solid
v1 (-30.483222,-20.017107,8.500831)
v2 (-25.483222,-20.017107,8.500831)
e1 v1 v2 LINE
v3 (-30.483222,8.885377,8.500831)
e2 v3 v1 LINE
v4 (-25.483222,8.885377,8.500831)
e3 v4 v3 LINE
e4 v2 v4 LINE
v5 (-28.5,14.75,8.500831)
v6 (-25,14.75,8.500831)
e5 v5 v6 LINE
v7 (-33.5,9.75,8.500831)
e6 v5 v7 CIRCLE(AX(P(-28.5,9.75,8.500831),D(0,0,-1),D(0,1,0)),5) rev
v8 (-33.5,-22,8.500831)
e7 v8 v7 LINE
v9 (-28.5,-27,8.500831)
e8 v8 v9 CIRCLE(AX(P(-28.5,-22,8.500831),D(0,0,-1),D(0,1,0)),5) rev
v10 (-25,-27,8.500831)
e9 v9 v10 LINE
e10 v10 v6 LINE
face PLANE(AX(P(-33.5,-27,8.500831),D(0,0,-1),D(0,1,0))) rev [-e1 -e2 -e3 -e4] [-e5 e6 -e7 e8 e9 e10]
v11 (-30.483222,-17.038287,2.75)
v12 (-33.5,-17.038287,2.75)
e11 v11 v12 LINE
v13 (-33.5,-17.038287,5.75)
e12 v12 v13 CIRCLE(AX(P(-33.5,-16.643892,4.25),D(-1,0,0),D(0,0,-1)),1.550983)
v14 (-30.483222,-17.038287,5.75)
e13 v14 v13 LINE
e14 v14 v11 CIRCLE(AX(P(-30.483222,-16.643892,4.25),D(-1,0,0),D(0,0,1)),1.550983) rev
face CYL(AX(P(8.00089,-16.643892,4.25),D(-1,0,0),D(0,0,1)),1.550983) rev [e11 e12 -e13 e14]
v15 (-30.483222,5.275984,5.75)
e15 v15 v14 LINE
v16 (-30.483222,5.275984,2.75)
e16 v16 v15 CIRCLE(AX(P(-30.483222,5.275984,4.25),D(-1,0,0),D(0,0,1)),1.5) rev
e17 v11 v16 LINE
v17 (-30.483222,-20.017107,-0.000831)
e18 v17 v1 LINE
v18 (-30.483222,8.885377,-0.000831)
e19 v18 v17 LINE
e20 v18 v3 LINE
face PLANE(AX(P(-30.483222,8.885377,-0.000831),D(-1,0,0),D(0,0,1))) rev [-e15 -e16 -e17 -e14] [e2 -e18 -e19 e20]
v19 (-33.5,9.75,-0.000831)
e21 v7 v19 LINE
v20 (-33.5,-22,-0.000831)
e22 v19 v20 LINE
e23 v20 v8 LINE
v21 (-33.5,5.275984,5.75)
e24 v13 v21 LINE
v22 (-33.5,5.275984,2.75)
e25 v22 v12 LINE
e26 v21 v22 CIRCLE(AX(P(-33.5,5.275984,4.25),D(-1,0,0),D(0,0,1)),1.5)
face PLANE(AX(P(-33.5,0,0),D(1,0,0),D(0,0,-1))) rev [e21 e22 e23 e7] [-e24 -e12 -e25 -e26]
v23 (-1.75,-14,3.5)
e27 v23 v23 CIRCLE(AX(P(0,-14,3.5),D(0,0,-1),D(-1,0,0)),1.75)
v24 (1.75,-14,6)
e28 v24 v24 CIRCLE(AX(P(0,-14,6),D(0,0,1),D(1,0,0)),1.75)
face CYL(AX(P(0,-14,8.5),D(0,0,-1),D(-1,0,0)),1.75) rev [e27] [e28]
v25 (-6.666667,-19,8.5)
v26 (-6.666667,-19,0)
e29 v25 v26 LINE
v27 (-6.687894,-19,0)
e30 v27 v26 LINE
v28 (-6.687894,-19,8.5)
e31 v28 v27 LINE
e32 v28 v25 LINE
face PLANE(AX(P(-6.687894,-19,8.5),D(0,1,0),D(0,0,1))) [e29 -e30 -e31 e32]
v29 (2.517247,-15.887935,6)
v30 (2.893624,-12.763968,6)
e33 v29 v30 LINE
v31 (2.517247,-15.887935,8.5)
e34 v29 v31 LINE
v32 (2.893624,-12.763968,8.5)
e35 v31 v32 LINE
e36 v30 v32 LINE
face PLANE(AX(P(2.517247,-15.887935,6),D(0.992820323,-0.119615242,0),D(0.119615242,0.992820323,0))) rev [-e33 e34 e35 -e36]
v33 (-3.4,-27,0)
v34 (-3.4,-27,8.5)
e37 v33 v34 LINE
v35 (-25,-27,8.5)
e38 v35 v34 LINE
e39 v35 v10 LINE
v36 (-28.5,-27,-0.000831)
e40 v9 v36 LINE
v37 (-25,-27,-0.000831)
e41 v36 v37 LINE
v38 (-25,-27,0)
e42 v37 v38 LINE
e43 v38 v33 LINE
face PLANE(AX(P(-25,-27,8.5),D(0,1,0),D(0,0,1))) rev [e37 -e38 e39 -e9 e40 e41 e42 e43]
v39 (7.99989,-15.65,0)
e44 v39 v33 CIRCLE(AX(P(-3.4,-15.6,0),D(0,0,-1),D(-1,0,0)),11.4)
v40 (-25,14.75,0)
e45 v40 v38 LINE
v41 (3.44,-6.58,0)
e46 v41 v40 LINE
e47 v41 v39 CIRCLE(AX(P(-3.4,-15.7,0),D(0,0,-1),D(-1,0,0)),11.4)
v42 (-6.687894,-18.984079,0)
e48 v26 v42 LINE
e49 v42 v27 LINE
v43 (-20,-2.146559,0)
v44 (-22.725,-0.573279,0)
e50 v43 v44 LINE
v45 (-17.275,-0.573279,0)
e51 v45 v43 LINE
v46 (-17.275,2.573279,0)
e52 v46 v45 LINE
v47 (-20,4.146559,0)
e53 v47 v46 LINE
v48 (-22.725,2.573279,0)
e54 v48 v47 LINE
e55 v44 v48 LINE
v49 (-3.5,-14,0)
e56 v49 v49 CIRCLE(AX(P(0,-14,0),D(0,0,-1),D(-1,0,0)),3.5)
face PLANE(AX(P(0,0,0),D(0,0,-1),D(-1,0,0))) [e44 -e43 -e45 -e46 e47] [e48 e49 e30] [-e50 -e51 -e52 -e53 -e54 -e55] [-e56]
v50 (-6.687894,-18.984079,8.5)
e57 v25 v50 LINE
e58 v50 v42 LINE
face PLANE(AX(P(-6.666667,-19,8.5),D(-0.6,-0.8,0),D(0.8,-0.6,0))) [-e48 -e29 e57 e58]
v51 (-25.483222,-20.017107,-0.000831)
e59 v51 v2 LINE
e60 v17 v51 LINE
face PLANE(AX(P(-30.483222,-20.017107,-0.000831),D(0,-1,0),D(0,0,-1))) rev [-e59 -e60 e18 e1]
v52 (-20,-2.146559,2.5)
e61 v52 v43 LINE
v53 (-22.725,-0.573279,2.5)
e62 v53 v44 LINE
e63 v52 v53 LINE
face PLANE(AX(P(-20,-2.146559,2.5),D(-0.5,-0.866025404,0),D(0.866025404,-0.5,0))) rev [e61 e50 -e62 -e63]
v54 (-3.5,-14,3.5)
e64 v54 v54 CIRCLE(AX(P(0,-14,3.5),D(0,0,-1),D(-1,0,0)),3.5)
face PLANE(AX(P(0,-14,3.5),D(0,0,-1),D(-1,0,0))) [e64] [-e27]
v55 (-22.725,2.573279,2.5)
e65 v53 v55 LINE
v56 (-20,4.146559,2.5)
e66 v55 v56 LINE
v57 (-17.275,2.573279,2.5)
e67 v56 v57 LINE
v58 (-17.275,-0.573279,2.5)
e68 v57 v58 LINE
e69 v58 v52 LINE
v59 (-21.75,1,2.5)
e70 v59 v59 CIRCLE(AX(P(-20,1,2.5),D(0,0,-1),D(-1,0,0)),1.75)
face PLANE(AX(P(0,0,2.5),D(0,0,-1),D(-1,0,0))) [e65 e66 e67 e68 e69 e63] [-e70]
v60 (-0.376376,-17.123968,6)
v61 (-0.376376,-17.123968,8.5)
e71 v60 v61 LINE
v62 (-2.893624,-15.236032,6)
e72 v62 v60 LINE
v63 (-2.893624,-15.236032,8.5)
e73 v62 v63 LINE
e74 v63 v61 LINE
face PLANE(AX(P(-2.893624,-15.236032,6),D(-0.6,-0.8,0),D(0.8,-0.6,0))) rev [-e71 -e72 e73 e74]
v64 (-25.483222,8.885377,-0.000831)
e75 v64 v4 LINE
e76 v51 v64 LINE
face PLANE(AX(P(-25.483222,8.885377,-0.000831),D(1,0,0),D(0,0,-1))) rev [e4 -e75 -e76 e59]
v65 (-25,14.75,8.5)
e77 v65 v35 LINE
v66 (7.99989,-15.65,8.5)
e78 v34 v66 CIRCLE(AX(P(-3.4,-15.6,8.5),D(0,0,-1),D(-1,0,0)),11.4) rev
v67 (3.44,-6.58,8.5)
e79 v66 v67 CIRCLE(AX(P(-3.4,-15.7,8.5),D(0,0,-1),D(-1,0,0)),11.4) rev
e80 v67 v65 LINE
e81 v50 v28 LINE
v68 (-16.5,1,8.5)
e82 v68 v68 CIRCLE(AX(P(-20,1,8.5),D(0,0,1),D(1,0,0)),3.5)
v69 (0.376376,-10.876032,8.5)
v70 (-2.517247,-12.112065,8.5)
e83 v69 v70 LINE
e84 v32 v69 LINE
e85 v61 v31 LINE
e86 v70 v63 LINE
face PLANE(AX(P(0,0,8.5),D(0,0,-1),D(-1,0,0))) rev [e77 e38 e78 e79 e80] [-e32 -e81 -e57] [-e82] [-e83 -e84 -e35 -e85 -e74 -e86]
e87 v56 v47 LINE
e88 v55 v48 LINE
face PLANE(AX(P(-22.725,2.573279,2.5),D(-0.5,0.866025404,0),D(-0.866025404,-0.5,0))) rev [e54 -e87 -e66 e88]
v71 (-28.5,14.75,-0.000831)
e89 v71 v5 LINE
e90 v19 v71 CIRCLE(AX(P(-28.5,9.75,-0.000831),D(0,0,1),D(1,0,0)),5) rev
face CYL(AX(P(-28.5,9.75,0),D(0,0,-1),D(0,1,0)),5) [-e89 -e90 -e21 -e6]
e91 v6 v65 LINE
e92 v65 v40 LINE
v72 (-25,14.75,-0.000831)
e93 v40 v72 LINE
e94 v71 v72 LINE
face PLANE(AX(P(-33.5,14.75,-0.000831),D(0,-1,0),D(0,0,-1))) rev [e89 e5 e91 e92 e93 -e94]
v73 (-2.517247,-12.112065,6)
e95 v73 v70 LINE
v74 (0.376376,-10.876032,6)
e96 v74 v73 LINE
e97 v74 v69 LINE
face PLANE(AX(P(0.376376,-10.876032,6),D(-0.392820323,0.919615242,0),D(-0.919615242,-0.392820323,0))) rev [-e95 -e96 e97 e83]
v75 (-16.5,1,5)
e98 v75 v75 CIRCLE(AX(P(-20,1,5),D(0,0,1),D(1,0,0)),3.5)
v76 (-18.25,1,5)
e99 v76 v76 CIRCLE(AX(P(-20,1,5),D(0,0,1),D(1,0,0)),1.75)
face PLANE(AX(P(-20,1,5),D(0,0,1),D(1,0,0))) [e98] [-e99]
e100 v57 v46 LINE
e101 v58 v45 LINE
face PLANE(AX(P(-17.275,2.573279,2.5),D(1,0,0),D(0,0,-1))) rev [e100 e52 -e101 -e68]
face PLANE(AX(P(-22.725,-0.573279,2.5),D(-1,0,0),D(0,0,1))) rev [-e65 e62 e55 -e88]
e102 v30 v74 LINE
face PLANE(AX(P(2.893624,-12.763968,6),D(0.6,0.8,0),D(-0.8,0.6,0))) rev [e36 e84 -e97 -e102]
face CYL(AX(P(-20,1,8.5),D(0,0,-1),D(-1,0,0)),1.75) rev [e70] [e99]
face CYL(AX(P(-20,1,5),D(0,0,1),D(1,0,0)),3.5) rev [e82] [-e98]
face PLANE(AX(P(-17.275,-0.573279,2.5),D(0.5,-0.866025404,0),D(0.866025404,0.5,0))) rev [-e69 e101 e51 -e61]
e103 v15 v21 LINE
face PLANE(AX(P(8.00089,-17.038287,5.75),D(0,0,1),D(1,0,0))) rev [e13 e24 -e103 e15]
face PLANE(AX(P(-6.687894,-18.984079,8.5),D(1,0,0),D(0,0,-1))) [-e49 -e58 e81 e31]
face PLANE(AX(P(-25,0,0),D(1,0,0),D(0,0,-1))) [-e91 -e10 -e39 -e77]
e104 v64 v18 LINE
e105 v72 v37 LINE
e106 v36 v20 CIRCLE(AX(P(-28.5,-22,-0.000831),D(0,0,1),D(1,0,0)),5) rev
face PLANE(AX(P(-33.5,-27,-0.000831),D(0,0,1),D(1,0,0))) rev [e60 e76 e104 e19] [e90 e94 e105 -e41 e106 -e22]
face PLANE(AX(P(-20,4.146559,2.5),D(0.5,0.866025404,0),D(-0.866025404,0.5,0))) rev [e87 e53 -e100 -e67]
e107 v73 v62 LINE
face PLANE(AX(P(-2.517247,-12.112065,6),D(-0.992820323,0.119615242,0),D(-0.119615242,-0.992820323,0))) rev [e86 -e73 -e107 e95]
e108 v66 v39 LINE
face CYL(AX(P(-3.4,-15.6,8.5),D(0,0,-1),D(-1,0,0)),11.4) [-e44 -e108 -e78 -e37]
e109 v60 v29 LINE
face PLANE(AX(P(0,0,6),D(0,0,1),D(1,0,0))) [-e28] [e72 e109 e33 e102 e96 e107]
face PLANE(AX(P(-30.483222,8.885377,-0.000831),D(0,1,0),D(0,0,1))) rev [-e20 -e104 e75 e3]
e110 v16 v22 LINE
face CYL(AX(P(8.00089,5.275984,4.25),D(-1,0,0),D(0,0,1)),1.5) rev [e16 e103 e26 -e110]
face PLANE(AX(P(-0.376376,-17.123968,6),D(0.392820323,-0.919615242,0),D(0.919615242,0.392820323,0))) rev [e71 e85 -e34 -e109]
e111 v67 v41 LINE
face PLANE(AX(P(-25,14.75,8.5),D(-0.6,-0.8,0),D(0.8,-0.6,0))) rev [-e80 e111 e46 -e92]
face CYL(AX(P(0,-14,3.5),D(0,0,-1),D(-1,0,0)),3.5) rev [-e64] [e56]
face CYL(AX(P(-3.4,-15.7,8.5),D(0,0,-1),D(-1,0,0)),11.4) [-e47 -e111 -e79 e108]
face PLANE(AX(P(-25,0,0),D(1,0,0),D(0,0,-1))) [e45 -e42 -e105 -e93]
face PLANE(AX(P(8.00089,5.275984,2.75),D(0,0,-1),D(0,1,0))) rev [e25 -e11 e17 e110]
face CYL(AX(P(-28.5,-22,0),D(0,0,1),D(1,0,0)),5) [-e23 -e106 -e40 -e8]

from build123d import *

# Parameters (mm, degrees)
SKETCH1_R           = 1.75
BOSS_EXTRUDE1_DEPTH = 8.5
CUT_EXTRUDE2_DEPTH  = 2.5
CUT_EXTRUDE3_DEPTH  = 2.5
SKETCH5_R           = 3.5
CUT_EXTRUDE4_DEPTH  = 3.5
SKETCH6_R           = 3.5
CUT_EXTRUDE5_DEPTH  = 3.5
FILLET1_R           = 11.4
SKETCH7_W           = 8.501662988
SKETCH7_H           = 41.75
BOSS_EXTRUDE3_DEPTH = 8.5
SKETCH8_W           = 5
SKETCH8_H           = 28.902484154
CUT_EXTRUDE6_DEPTH  = 44.858046851
CUT_EXTRUDE7_REACH  = 52.235
FILLET2_R           = 5
FILLET3_R           = 5


with BuildPart() as part:
    # Sketch1 → Boss-Extrude1 (new body)
    with BuildSketch(Plane.XY):
        Polygon((8, -10), (8, -27), (-25, -27), (-25, 14.75), align=None)
        with Locations((-20, 1)):
            Circle(SKETCH1_R, mode=Mode.SUBTRACT)
        with Locations((0, -14)):
            Circle(SKETCH1_R, mode=Mode.SUBTRACT)
        Polygon((-6.687894354, -19), (-6.666666667, -19), (-6.687894354, -18.984079234), align=None, mode=Mode.SUBTRACT)
    extrude(amount=BOSS_EXTRUDE1_DEPTH)

    # Sketch3 → Cut-Extrude2 (cut)
    with BuildSketch(Plane(origin=(0, 0, 0), x_dir=(-1, 0, 0), z_dir=(0, 0, -1))):
        Polygon((22.725, 2.573279484), (20, 4.146558967), (17.275, 2.573279484), (17.275, -0.573279484), (20, -2.146558967), (22.725, -0.573279484), align=None)
    extrude(amount=-CUT_EXTRUDE2_DEPTH, mode=Mode.SUBTRACT)

    # Sketch4 → Cut-Extrude3 (cut)
    with BuildSketch(Plane.XY.offset(8.5)):
        Polygon((-2.517247174, -12.11206462), (-2.893623587, -15.23603231), (-0.376376413, -17.12396769), (2.517247174, -15.88793538), (2.893623587, -12.76396769), (0.376376413, -10.87603231), align=None)
    extrude(amount=-CUT_EXTRUDE3_DEPTH, mode=Mode.SUBTRACT)

    # Sketch5 → Cut-Extrude4 (cut)
    with BuildSketch(Plane.XY.offset(8.5)):
        with Locations((-20, 1)):
            Circle(SKETCH5_R)
    extrude(amount=-CUT_EXTRUDE4_DEPTH, mode=Mode.SUBTRACT)

    # Sketch6 → Cut-Extrude5 (cut)
    with BuildSketch(Plane(origin=(0, 0, 0), x_dir=(-1, 0, 0), z_dir=(0, 0, -1))):
        with Locations((0, -14)):
            Circle(SKETCH6_R)
    extrude(amount=-CUT_EXTRUDE5_DEPTH, mode=Mode.SUBTRACT)

    # Fillet1
    # the kernel refuses this fillet: 11.4 mm, written as the material it takes off along each edge
    with BuildSketch(Plane(origin=(8, -10, -14.25), x_dir=(0, -1, 0), z_dir=(0, 0, 1))) as fillet1_piece_1:
        with BuildLine():
            CenterArc((FILLET1_R * 0.5, -FILLET1_R), FILLET1_R, 90, 53.130102354)
            Line((-FILLET1_R * 0.3, -FILLET1_R * 0.4), (0, 0))
            Line((0, 0), (FILLET1_R * 0.5, 0))
        make_face()
    extrude(amount=37, mode=Mode.SUBTRACT)
    with BuildSketch(Plane(origin=(8, -27, -28.5), x_dir=(0, 1, 0), z_dir=(0, 0, 1))) as fillet1_piece_2:
        with BuildLine():
            CenterArc((FILLET1_R, FILLET1_R), FILLET1_R, 180, 90)
            Line((0, FILLET1_R), (0, 0))
            Line((0, 0), (FILLET1_R, 0))
        make_face()
    extrude(amount=65.5, mode=Mode.SUBTRACT)

    # Sketch7 → Boss-Extrude3 (add)
    with BuildSketch(Plane.ZY.offset(25)):
        with Locations((4.25, -6.125)):
            Rectangle(SKETCH7_W, SKETCH7_H)
    extrude(amount=BOSS_EXTRUDE3_DEPTH)

    # Sketch8 → Cut-Extrude6 (cut, through all)
    with BuildSketch(Plane.XY.offset(8.500831494)):
        with Locations((-27.983222081, -5.565864812)):
            Rectangle(SKETCH8_W, SKETCH8_H)
    extrude(amount=-CUT_EXTRUDE6_DEPTH, mode=Mode.SUBTRACT)

    # Sketch9 → Cut-Extrude7 (cut, up to next)
    with BuildSketch(Plane.ZY.offset(33.5), mode=Mode.PRIVATE) as cut_extrude7_sk1:
        with BuildLine():
            Line((5.75, -17.038286927), (5.75, 5.275984322))
            ThreePointArc((5.75, 5.275984322), (4.25, 6.775984322), (2.75, 5.275984322))
            Line((2.75, 5.275984322), (2.75, -17.038286927))
            ThreePointArc((2.75, -17.038286927), (4.25, -18.194874392), (5.75, -17.038286927))
        make_face()
    cut_extrude7_tool1 = extrude(cut_extrude7_sk1.sketch, amount=-CUT_EXTRUDE7_REACH, mode=Mode.PRIVATE) & part.part
    add(cut_extrude7_tool1.solids().sort_by_distance((-33.5, -5.719772, 4.25))[0], mode=Mode.SUBTRACT)

    # Fillet2
    fillet2_edges = [part.edges().sort_by_distance(p)[0] for p in [
        (-33.5, -27, 4.25),
    ]]
    fillet(fillet2_edges, radius=FILLET2_R)

    # Fillet3
    fillet3_edges = [part.edges().sort_by_distance(p)[0] for p in [
        (-33.5, 14.75, 4.25),
    ]]
    fillet(fillet3_edges, radius=FILLET3_R)


solid = part.part
